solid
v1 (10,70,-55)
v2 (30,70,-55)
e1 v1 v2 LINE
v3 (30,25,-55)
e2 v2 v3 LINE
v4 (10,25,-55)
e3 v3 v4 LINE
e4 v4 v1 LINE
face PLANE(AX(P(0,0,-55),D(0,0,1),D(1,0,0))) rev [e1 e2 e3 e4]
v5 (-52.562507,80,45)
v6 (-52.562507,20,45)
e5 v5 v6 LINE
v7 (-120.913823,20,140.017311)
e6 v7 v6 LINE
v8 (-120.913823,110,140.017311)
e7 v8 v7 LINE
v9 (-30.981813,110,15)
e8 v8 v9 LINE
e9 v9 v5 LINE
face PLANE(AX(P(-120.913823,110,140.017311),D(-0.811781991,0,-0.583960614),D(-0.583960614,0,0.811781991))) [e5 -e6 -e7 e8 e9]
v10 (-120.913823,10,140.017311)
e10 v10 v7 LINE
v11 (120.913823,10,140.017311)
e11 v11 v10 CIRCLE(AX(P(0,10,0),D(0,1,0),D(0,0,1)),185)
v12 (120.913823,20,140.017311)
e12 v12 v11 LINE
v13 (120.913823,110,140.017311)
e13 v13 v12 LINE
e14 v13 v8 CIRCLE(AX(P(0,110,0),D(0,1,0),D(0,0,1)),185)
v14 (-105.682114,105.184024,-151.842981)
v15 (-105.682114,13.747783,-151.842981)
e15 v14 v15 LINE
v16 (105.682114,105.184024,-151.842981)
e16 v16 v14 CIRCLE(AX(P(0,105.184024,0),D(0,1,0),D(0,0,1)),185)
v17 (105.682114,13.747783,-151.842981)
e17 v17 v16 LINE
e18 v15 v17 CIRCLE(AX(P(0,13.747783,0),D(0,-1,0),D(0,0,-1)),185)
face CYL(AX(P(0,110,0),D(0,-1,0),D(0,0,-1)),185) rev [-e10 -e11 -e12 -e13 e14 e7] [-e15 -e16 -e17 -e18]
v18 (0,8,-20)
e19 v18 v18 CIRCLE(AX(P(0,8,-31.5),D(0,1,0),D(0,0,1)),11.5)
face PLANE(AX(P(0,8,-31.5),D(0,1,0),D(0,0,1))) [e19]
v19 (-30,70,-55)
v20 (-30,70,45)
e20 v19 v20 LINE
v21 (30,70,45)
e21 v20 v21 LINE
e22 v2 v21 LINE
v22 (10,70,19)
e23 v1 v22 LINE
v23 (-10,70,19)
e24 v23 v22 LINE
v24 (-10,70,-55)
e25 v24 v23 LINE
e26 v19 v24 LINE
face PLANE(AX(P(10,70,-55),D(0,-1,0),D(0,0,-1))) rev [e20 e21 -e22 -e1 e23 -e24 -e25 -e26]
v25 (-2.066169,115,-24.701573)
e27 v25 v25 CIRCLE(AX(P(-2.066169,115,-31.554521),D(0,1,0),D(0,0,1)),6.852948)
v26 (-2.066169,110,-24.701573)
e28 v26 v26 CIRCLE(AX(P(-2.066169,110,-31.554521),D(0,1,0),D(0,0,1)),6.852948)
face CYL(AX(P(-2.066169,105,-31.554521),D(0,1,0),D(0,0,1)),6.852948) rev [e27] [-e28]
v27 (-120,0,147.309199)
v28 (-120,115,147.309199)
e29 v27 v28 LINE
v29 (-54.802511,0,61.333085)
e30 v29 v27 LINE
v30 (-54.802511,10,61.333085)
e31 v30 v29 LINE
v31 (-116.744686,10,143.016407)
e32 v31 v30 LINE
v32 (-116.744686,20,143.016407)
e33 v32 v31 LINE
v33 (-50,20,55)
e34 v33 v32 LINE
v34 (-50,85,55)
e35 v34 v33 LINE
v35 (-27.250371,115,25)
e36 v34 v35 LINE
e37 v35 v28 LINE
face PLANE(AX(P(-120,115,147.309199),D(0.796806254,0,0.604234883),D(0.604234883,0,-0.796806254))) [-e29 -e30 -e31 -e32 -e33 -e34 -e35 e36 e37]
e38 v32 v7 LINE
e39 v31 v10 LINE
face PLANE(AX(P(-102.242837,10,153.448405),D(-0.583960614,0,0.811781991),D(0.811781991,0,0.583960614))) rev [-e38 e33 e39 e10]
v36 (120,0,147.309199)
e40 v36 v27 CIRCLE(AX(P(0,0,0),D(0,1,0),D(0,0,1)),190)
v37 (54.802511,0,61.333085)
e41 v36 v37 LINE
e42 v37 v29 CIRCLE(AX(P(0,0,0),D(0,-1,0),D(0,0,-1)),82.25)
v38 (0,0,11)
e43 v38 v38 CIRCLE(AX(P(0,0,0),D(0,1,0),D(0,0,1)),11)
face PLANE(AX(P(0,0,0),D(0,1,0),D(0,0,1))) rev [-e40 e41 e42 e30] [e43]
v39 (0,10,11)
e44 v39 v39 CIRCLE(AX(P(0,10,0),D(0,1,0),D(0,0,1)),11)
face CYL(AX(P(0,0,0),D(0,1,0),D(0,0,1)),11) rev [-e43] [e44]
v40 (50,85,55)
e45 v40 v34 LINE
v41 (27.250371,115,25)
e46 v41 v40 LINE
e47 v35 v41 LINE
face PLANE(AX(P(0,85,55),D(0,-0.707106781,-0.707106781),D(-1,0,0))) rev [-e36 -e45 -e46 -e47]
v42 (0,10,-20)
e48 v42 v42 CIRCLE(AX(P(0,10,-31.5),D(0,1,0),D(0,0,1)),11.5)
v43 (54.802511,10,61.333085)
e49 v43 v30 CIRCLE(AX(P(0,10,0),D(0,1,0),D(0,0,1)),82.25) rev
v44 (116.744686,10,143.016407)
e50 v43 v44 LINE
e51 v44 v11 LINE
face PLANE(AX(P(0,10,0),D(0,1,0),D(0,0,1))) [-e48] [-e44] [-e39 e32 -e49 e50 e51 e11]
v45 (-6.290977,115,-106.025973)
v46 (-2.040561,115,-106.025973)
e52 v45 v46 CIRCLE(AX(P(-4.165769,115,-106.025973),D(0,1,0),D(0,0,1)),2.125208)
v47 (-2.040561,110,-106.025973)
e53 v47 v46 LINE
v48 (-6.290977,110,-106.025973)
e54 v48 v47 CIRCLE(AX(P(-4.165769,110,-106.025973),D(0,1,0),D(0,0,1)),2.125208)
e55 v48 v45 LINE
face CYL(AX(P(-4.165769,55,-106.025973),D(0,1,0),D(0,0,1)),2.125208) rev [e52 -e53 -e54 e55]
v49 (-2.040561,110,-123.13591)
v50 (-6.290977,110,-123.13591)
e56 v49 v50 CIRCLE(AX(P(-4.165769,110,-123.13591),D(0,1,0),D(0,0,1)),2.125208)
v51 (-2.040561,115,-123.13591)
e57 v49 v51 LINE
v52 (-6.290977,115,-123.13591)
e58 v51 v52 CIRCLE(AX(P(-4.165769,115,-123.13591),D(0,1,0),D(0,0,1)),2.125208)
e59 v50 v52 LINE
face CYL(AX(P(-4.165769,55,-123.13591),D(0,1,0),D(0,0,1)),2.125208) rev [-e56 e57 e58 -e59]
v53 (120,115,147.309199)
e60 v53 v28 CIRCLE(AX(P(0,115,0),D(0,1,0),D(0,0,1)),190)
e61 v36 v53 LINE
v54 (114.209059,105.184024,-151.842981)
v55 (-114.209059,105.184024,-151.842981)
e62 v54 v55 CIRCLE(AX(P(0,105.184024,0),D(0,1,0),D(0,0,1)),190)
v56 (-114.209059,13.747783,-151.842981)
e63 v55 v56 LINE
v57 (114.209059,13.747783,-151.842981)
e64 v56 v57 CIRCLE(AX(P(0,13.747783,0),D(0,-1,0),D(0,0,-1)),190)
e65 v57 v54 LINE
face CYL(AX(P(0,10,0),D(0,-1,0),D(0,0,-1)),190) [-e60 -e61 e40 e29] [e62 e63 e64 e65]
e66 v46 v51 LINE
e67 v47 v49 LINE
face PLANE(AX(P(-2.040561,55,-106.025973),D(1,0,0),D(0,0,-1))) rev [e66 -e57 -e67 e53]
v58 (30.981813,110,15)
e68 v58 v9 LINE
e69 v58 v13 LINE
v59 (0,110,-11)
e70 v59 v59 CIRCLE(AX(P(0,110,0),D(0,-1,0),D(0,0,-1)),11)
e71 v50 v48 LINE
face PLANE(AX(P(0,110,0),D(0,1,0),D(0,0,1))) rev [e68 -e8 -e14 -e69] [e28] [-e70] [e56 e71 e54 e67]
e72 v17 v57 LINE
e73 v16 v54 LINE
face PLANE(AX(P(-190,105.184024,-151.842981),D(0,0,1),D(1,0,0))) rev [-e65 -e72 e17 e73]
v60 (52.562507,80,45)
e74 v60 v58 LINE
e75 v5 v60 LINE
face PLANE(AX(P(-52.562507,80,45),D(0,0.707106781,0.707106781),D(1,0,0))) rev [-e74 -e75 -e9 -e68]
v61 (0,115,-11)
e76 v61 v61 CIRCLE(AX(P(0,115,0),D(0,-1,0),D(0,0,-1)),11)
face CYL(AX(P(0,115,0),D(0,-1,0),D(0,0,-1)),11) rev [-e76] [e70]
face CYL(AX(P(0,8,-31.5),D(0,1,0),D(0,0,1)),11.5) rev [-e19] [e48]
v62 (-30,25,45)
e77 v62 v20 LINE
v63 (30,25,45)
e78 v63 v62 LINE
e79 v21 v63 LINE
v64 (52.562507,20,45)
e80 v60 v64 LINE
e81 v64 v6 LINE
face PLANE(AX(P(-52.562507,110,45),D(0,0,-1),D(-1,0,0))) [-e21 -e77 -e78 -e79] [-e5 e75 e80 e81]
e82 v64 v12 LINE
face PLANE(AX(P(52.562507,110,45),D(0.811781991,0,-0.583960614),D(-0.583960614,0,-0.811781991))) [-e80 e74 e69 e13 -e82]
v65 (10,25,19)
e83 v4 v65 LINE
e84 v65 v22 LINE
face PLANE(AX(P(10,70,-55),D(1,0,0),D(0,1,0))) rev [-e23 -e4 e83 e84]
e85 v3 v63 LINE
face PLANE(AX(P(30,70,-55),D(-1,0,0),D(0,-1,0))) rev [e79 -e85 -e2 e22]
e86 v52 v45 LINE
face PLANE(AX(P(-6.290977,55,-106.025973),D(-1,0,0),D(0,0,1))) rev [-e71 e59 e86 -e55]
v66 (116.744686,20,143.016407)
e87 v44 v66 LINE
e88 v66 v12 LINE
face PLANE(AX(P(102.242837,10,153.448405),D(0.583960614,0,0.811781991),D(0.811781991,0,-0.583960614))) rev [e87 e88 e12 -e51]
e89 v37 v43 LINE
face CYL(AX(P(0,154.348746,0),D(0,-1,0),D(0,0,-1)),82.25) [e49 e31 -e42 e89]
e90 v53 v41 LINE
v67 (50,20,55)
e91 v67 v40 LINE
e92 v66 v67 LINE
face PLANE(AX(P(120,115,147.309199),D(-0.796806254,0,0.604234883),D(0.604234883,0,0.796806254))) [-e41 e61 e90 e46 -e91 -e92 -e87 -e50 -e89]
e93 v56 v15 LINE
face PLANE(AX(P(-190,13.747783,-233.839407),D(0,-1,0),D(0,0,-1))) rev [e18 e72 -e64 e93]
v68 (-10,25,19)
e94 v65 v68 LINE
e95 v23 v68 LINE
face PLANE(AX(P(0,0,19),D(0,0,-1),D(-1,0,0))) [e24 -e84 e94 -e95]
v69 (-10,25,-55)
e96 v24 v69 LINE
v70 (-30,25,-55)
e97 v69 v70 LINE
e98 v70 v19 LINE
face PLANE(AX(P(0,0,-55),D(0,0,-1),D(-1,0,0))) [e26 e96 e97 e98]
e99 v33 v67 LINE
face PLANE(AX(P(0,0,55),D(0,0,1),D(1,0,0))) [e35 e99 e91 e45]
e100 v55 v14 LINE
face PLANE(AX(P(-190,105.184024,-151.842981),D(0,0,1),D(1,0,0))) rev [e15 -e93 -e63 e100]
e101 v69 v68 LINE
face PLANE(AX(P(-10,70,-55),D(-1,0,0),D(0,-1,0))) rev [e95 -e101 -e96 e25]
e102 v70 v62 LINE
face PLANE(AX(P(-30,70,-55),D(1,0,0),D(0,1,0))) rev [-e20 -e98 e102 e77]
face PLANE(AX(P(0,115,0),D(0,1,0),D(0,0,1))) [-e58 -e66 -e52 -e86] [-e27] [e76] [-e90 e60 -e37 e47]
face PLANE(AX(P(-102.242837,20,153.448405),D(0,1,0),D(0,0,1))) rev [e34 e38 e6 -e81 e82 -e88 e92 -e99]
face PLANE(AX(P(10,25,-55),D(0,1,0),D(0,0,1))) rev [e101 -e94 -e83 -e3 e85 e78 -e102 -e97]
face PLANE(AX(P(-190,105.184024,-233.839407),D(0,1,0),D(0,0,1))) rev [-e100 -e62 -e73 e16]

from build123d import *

# Parameters (mm, degrees)
SKETCH_1_R                = 190
EXTRUDE_1_DEPTH           = 10
SKETCH_2_R                = 11
CUT_EXTRUDE_1_DEPTH       = 10
CUT_EXTRUDE_2_DEPTH       = 10
CUT_EXTRUDE_3_DEPTH       = 10
SKETCH_5_R                = 11.5
CUT_EXTRUDE_4_DEPTH       = 2
EXTRUDE_2_DEPTH           = 100
EXTRUDE_3_DEPTH           = 5
CUT_EXTRUDE_START         = -5
SKETCH_11_R               = 11
CUT_EXTRUDE_7_DEPTH       = 5
SKETCH_12_W               = 100
SKETCH_12_H               = 115
EXTRUDE_4_DEPTH           = 5
EXTRUDE_5_DEPTH           = 115
CUT_EXTRUDE_8_DEPTH       = 289.487434735
SKETCH_15_W               = 110
SKETCH_15_H               = 10
CUT_EXTRUDE_9_DEPTH       = 23
SKETCH_16_W               = 110
SKETCH_16_H               = 10
CUT_EXTRUDE_10_DEPTH      = 23
EXTRUDE_6_DEPTH           = 10
SKETCH_18_R               = 10
EXTRUDE_7_DEPTH           = 100
SKETCH_20_W               = 40.15762627
SKETCH_20_H               = 37.957208392
EXTRUDE_8_DEPTH           = 20
CUT_EXTRUDE_11_DEPTH      = 70
SKETCH_22_W               = 6
SKETCH_22_H               = 39.800206828
SKETCH_24_R               = 10.715541735
EXTRUDE_9_DEPTH           = 50
SKETCH_25_R               = 8.111462828
CUT_EXTRUDE_13_DEPTH      = 1
FILLET_2_R                = 3
SKETCH_26_W               = 20.914862296
SKETCH_26_H               = 66.390296829
CUT_EXTRUDE_14_DEPTH      = 41
EXTRUDE_START             = -5
EXTRUDE_10_DEPTH          = 5
CUT_EXTRUDE_15_DEPTH      = 369.496652909
CUT_EXTRUDE_15_DEPTH_BACK = 369.496652909
SKETCH_28_W               = 81.996426071
SKETCH_28_H               = 91.436240801
EXTRUDE_11_DEPTH          = 142
SKETCH_30_W               = 61.807944975
SKETCH_30_H               = 65.134221846
EXTRUDE_12_DEPTH          = 5
FILLET_4_R                = 13
SKETCH_31_W               = 61.807944975
SKETCH_31_H               = 147
EXTRUDE_13_DEPTH          = 70
SKETCH_32_W               = 51.807944975
SKETCH_32_H               = 142
CUT_EXTRUDE_16_DEPTH      = 60
FILLET_5_R                = 13
FILLET_6_R                = 13
CUT_EXTRUDE_17_DEPTH      = 60
CUT_EXTRUDE_18_DEPTH      = 60
EXTRUDE_START_2           = -75
SKETCH_35_W               = 61.807944975
SKETCH_35_H               = 6.562212177
EXTRUDE_14_DEPTH          = 75
CUT_EXTRUDE_19_DEPTH      = 60
CUT_EXTRUDE_START_2       = 70
CUT_EXTRUDE_20_DEPTH      = 70
SKETCH_40_R               = 6.852948308
CUT_EXTRUDE_24_DEPTH      = 10
CHAMFER_1_SIZE            = 30
CHAMFER_2_SIZE            = 30
CUT_EXTRUDE_25_DEPTH      = 216
CUT_EXTRUDE_26_DEPTH      = 10
CUT_EXTRUDE_26_DEPTH_BACK = 20
SKETCH_42_W               = 161.925382199
SKETCH_42_H               = 10
SKETCH_43_W               = 20
SKETCH_43_H               = 45
EXTRUDE_15_DEPTH          = 100
SKETCH_44_W               = 60
SKETCH_44_H               = 45
EXTRUDE_16_DEPTH          = 26


# Read off the part's stored shape, not the designer's step: 圆顶1
with BuildPart() as part:
    # 草图1 → 凸台-拉伸1 (new body)
    with BuildSketch(Plane(origin=(0, 0, 0), x_dir=(1, 0, 0), z_dir=(0, 1, 0))):
        with Locations(Location((0, 0, 0), (0, 0, 270))):
            Circle(SKETCH_1_R)
    extrude(amount=EXTRUDE_1_DEPTH)

    # 草图2 → 切除-拉伸1 (cut)
    with BuildSketch(Plane(origin=(0, 10, 0), x_dir=(1, 0, 0), z_dir=(0, 1, 0))):
        with Locations(Location((0, 0, 0), (0, 0, 270))):
            Circle(SKETCH_2_R)
    extrude(amount=-CUT_EXTRUDE_1_DEPTH, mode=Mode.SUBTRACT)

    # 草图3 → 切除-拉伸2 (cut)
    with BuildSketch(Plane(origin=(0, 10, 0), x_dir=(1, 0, 0), z_dir=(0, 1, 0))):
        Polygon((-50, -50), (-120, -147.309198627), (120, -147.309198627), (50, -50), align=None)
    extrude(amount=-CUT_EXTRUDE_2_DEPTH, mode=Mode.SUBTRACT)

    # 草图4 → 切除-拉伸3 (cut)
    with BuildSketch(Plane(origin=(0, 10, 0), x_dir=(1, 0, 0), z_dir=(0, 1, 0))):
        Polygon((50, -50), (136.06201209, -169.637506124), (-54.476164161, -215.928987862), (-150.534220248, -169.637506124), (-120, -147.309198627), (-80.889727825, -92.940780863), align=None)
    extrude(amount=-CUT_EXTRUDE_3_DEPTH, mode=Mode.SUBTRACT)

    # 草图5 → 切除-拉伸4 (cut)
    with BuildSketch(Plane(origin=(0, 10, 0), x_dir=(1, 0, 0), z_dir=(0, 1, 0))):
        with Locations(Location((0, 31.5, 0), (0, 0, 270))):
            Circle(SKETCH_5_R)
    extrude(amount=-CUT_EXTRUDE_4_DEPTH, mode=Mode.SUBTRACT)

    # 草图9 → 凸台-拉伸2 (add)
    with BuildSketch(Plane(origin=(0, 10, 0), x_dir=(1, 0, 0), z_dir=(0, 1, 0))):
        with BuildLine():
            Line((50, -50), (120, -147.309198627))
            ThreePointArc((120, -147.309198627), (0, 190), (-120, -147.309198627))
            Line((-120, -147.309198627), (-50, -50))
            Line((-50, -50), (50, -50))
        make_face()
        with BuildLine():
            Line((52.56250687, -45), (120.913822869, -140.017311213))
            ThreePointArc((120.913822869, -140.017311213), (0, 185), (-120.913822869, -140.017311213))
            Line((-120.913822869, -140.017311213), (-52.56250687, -45))
            Line((-52.56250687, -45), (52.56250687, -45))
        make_face(mode=Mode.SUBTRACT)
    extrude(amount=EXTRUDE_2_DEPTH)

    # 草图10 → 凸台-拉伸3 (add)
    with BuildSketch(Plane(origin=(0, 110, 0), x_dir=(1, 0, 0), z_dir=(0, 1, 0))):
        with BuildLine():
            Line((-50, -50), (50, -50))
            Line((50, -50), (120, -147.309198627))
            ThreePointArc((120, -147.309198627), (0, 190), (-120, -147.309198627))
            Line((-120, -147.309198627), (-50, -50))
        make_face()
    extrude(amount=EXTRUDE_3_DEPTH)

    # 草图11 → 切除-拉伸7 (cut)
    with BuildSketch(Plane.XZ.offset(-110).offset(CUT_EXTRUDE_START)):
        with Locations(Location((0, 0, 0), (0, 0, 90))):
            Circle(SKETCH_11_R)
    extrude(amount=CUT_EXTRUDE_7_DEPTH, mode=Mode.SUBTRACT)

    # 草图12 → 凸台-拉伸4 (add)
    with BuildSketch(Plane.XY.offset(50)):
        with Locations((0, 57.5)):
            Rectangle(SKETCH_12_W, SKETCH_12_H)
    extrude(amount=EXTRUDE_4_DEPTH)

    # 草图13 → 凸台-拉伸5 (add)
    with BuildSketch(Plane.XZ):
        Polygon((-120, 147.309198627), (-50, 55), (-50, 50), align=None)
        Polygon((50, 50), (120, 147.309198627), (50, 55), align=None)
    extrude(amount=-EXTRUDE_5_DEPTH)

    # 草图14 → 切除-拉伸8 (cut, through all)
    with BuildSketch(Plane(origin=(0, 10, 0), x_dir=(1, 0, 0), z_dir=(0, 1, 0))):
        with BuildLine():
            Line((-175, 60), (175, 60))
            ThreePointArc((175, 60), (0, 185), (-175, 60))
        make_face()
    extrude(amount=CUT_EXTRUDE_8_DEPTH, mode=Mode.SUBTRACT)

    # 草图15 → 切除-拉伸9 (cut)
    with BuildSketch(Plane(origin=(-13.305974514, 0, -9.571738635), x_dir=(-0.5839606140594331, 0, 0.8117819911942675), z_dir=(-0.8117819911942675, 0, -0.5839606140594331))):
        with Locations((129.272441949, 15)):
            Rectangle(SKETCH_15_W, SKETCH_15_H)
    extrude(amount=-CUT_EXTRUDE_9_DEPTH, mode=Mode.SUBTRACT)

    # 草图16 → 切除-拉伸10 (cut)
    with BuildSketch(Plane(origin=(13.305974514, 0, -9.571738635), x_dir=(-0.5839606140594333, 0, -0.8117819911942674), z_dir=(0.8117819911942673, 0, -0.5839606140594332))):
        with Locations((-129.272441949, 15)):
            Rectangle(SKETCH_16_W, SKETCH_16_H)
    extrude(amount=-CUT_EXTRUDE_10_DEPTH, mode=Mode.SUBTRACT)

    # 草图17 → 凸台-拉伸6 (add)
    with BuildSketch(Plane.XZ):
        with BuildLine():
            Line((-68.721971502, 45.192401274), (70.16486598, 42.91799252))
            ThreePointArc((70.16486598, 42.91799252), (1.34674419, 82.238973608), (-68.721971502, 45.192401274))
        make_face()
    extrude(amount=-EXTRUDE_6_DEPTH)

    # 草图18 → 凸台-拉伸7 (add)
    with BuildSketch(Plane(origin=(0, 115, 0), x_dir=(1, 0, 0), z_dir=(0, 1, 0))):
        with Locations(Location((0, 46.854928923, 0), (0, 0, 90))):
            Circle(SKETCH_18_R)
    extrude(amount=EXTRUDE_7_DEPTH)

    # 草图20 → 凸台-拉伸8 (add)
    with BuildSketch(Plane(origin=(0, 215, 0), x_dir=(1, 0, 0), z_dir=(0, 1, 0))):
        with Locations((-0.847426087, 46.622471939)):
            Rectangle(SKETCH_20_W, SKETCH_20_H)
    extrude(amount=EXTRUDE_8_DEPTH)

    # 草图21 → 切除-拉伸11 (cut)
    with BuildSketch(Plane.ZY.offset(20.926239222)):
        Polygon((-54.791741718, 236.72389037), (-19.944006341, 217.982251176), (-19.065492004, 240.530785832), align=None)
    extrude(amount=-CUT_EXTRUDE_11_DEPTH, mode=Mode.SUBTRACT)

    # 草图22 → 旋转1 (revolve)
    with BuildSketch(Plane(origin=(0, 160.757687824, 86.457916141), x_dir=(1, 0, 0), z_dir=(0, 0.8807086333026608, 0.4736584246333635)), mode=Mode.PRIVATE) as revolve_1_sk:
        with Locations((1.240539722, 142.968257651)):
            Rectangle(SKETCH_22_W, SKETCH_22_H)
    revolve(revolve_1_sk.sketch.rotate(Axis((-1.759460278, 237.901659149, -56.981655541), (0, -0.47365842463336366, 0.8807086333026606)), 90), axis=Axis((-1.759460278, 237.901659149, -56.981655541), (0, -0.47365842463336366, 0.8807086333026606)))

    # 草图24 → 凸台-拉伸9 (add)
    with BuildSketch(Plane(origin=(0, 58.292268059, -108.387185922), x_dir=(1, 0, 0), z_dir=(0, -0.4736584246333635, 0.8807086333026606))):
        with Locations(Location((-1.759460278, 182.532203893, 0), (0, 0, 270))):
            Circle(SKETCH_24_R)
    extrude(amount=-EXTRUDE_9_DEPTH)

    # 草图25 → 切除-拉伸13 (cut)
    with BuildSketch(Plane(origin=(0, 58.292268059, -108.387185922), x_dir=(1, 0, 0), z_dir=(0, -0.4736584246333635, 0.8807086333026606))):
        with Locations(Location((-1.759460278, 182.532203893, 0), (0, 0, 270))):
            Circle(SKETCH_25_R)
    extrude(amount=-CUT_EXTRUDE_13_DEPTH, mode=Mode.SUBTRACT)

    # 圆角2
    fillet_2_edges = [part.edges().sort_by_distance(p)[0] for p in [
        (0, 115, -36.854928923),
    ]]
    fillet(fillet_2_edges, radius=FILLET_2_R)

    # 草图26 → 切除-拉伸14 (cut)
    with BuildSketch(Plane(origin=(0, 160.757687824, 86.457916141), x_dir=(1, 0, 0), z_dir=(0, 0.8807086333026608, 0.4736584246333635))):
        with Locations((27.855490238, 146.001600843)):
            Rectangle(SKETCH_26_W, SKETCH_26_H)
    extrude(amount=-CUT_EXTRUDE_14_DEPTH, mode=Mode.SUBTRACT)

    # 草图27 → 凸台-拉伸10 (add)
    with BuildSketch(Plane(origin=(0, 115, 0), x_dir=(1, 0, 0), z_dir=(0, 1, 0)).offset(EXTRUDE_START)):
        with BuildLine():
            Line((-175, 60), (175, 60))
            ThreePointArc((175, 60), (0, 185), (-175, 60))
        make_face()
    extrude(amount=EXTRUDE_10_DEPTH)

    # 草图28 → 切除-拉伸15 (cut, two sides: drawn at the far end of the back side and taken through both)
    with BuildSketch(Plane(origin=(0, 0, 0), x_dir=(0, 0, -1), z_dir=(1, 0, 0)).offset(-CUT_EXTRUDE_15_DEPTH_BACK)):
        with Locations((192.841193776, 59.465903433)):
            Rectangle(SKETCH_28_W, SKETCH_28_H)
    extrude(amount=CUT_EXTRUDE_15_DEPTH + CUT_EXTRUDE_15_DEPTH_BACK, mode=Mode.SUBTRACT)

    # 草图29 → 凸台-拉伸11 (add)
    with BuildSketch(Plane(origin=(0, 115, 0), x_dir=(1, 0, 0), z_dir=(0, 1, 0))):
        Polygon((-32.985541705, 83.704196909), (-32.985541705, 18.569975063), (-27.985541705, 18.569975063), (-27.985541705, 78.704196909), (23.82240327, 78.704196909), (23.82240327, 18.569975063), (28.82240327, 18.569975063), (28.82240327, 83.704196909), align=None)
    extrude(amount=EXTRUDE_11_DEPTH)

    # 草图30 → 凸台-拉伸12 (add)
    with BuildSketch(Plane(origin=(0, 257, 0), x_dir=(1, 0, 0), z_dir=(0, 1, 0))):
        with Locations((-2.081569218, 51.137085986)):
            Rectangle(SKETCH_30_W, SKETCH_30_H)
    extrude(amount=EXTRUDE_12_DEPTH)

    # 圆角4
    fillet_4_edges = [part.edges().sort_by_distance(p)[0] for p in [
        (-27.985541705, 257, -48.637085986),
        (23.82240327, 257, -48.637085986),
    ]]
    fillet(fillet_4_edges, radius=FILLET_4_R)

    # 草图31 → 凸台-拉伸13 (add)
    with BuildSketch(Plane(origin=(0, 0, -83.704196909), x_dir=(-1, 0, 0), z_dir=(0, 0, -1))):
        with Locations((2.081569218, 188.5)):
            Rectangle(SKETCH_31_W, SKETCH_31_H)
    extrude(amount=EXTRUDE_13_DEPTH)

    # 草图32 → 切除-拉伸16 (cut)
    with BuildSketch(Plane(origin=(0, 0, -153.704196909), x_dir=(-1, 0, 0), z_dir=(0, 0, -1))):
        with Locations((2.081569218, 186)):
            Rectangle(SKETCH_32_W, SKETCH_32_H)
    extrude(amount=-CUT_EXTRUDE_16_DEPTH, mode=Mode.SUBTRACT)

    # 圆角5
    fillet_5_edges = [part.edges().sort_by_distance(p)[0] for p in [
        (-32.985541705, 262, -86.137085986),
        (28.82240327, 262, -86.137085986),
    ]]
    fillet(fillet_5_edges, radius=FILLET_5_R)

    # 圆角6
    fillet_6_edges = [part.edges().sort_by_distance(p)[0] for p in [
        (23.82240327, 257, -123.704196909),
        (-27.985541705, 257, -123.704196909),
    ]]
    fillet(fillet_6_edges, radius=FILLET_6_R)

    # 草图33 → 切除-拉伸17 (cut)
    with BuildSketch(Plane.XY.offset(-78.704196909)):
        with BuildLine():
            Line((13.892318938, 199.249147057), (13.892318938, 143.139086494))
            ThreePointArc((13.892318938, 143.139086494), (0, 129.246767556), (-13.892318938, 143.139086494))
            Line((-13.892318938, 143.139086494), (-13.892318938, 199.249147057))
            ThreePointArc((-13.892318938, 199.249147057), (0, 213.141465996), (13.892318938, 199.249147057))
        make_face()
    extrude(amount=-CUT_EXTRUDE_17_DEPTH, mode=Mode.SUBTRACT)

    # 草图34 → 切除-拉伸18 (cut)
    with BuildSketch(Plane(origin=(0, 115, 0), x_dir=(1, 0, 0), z_dir=(0, 1, 0))):
        with BuildLine():
            Line((-6.290976551, 106.02597296), (-6.290976551, 123.135910488))
            ThreePointArc((-6.290976551, 123.135910488), (-4.165768662, 125.261118376), (-2.040560774, 123.135910488))
            Line((-2.040560774, 123.135910488), (-2.040560774, 106.02597296))
            ThreePointArc((-2.040560774, 106.02597296), (-4.165768662, 103.900765071), (-6.290976551, 106.02597296))
        make_face()
    extrude(amount=-CUT_EXTRUDE_18_DEPTH, mode=Mode.SUBTRACT)

    # 草图35 → 凸台-拉伸14 (add)
    with BuildSketch(Plane(origin=(0, 0, -153.704196909), x_dir=(-1, 0, 0), z_dir=(0, 0, -1)).offset(EXTRUDE_START_2)):
        with Locations((2.081569218, 185.281106088)):
            Rectangle(SKETCH_35_W, SKETCH_35_H)
    extrude(amount=EXTRUDE_14_DEPTH)

    # 草图36 → 切除-拉伸19 (cut)
    with BuildSketch(Plane(origin=(0, 188.562212177, 0), x_dir=(1, 0, 0), z_dir=(0, 1, 0))):
        with BuildLine():
            Line((-6.290976551, 123.135910488), (-6.290976551, 106.02597296))
            ThreePointArc((-6.290976551, 106.02597296), (-4.165768662, 103.900765071), (-2.040560774, 106.02597296))
            Line((-2.040560774, 106.02597296), (-2.040560774, 123.135910488))
            ThreePointArc((-2.040560774, 123.135910488), (-4.165768662, 125.261118376), (-6.290976551, 123.135910488))
        make_face()
    extrude(amount=-CUT_EXTRUDE_19_DEPTH, mode=Mode.SUBTRACT)

    # 圆顶1 outline → 圆顶1 (revolve)
    with BuildSketch(Plane(origin=(-1.759460278, 160.757687824, 86.457916141), x_dir=(1, 0, 0), z_dir=(0, 0.880708633302661, 0.473658424633363))):
        with BuildLine():
            Line((0, 124.068154246), (0, 119.068154237))
            ThreePointArc((0, 119.068154237), (4.764342278, 120.41858011), (8.111462832, 124.068154246))
            Line((8.111462832, 124.068154246), (0, 124.068154246))
        make_face()
    revolve(axis=Axis((-1.759460278, 160.757687824, 86.457916141), (0, 0.473658424633363, -0.880708633302661)))

    # 草图37 → 切除-拉伸20 (cut)
    with BuildSketch(Plane.XY.offset(-78.704196909).offset(CUT_EXTRUDE_START_2)):
        with BuildLine():
            Line((-27.985541705, 115), (23.82240327, 115))
            Line((23.82240327, 115), (23.82240327, 244))
            ThreePointArc((23.82240327, 244), (20.014791425, 253.192388155), (10.82240327, 257))
            Line((10.82240327, 257), (-14.985541705, 257))
            ThreePointArc((-14.985541705, 257), (-24.177929861, 253.192388155), (-27.985541705, 244))
            Line((-27.985541705, 244), (-27.985541705, 115))
        make_face()
    extrude(amount=-CUT_EXTRUDE_20_DEPTH, mode=Mode.SUBTRACT)

    # 草图40 → 切除-拉伸24 (cut)
    with BuildSketch(Plane(origin=(0, 115, 0), x_dir=(1, 0, 0), z_dir=(0, 1, 0))):
        with Locations(Location((-2.06616942, 31.55452141, 0), (0, 0, 270))):
            Circle(SKETCH_40_R)
    extrude(amount=-CUT_EXTRUDE_24_DEPTH, mode=Mode.SUBTRACT)

    # 倒角1
    chamfer_1_edges = [part.edges().sort_by_distance(p)[0] for p in [
        (0, 115, 55),
    ]]
    chamfer(chamfer_1_edges, length=CHAMFER_1_SIZE)

    # 倒角2
    chamfer_2_edges = [part.edges().sort_by_distance(p)[0] for p in [
        (0, 110, 45),
    ]]
    chamfer(chamfer_2_edges, length=CHAMFER_2_SIZE)

    # 草图41 → 切除-拉伸25 (cut)
    with BuildSketch(Plane(origin=(0, 115, 0), x_dir=(1, 0, 0), z_dir=(0, 1, 0))):
        with BuildLine():
            Line((-120, -147.309198627), (-27.250371239, -25))
            Line((-27.250371239, -25), (27.250371239, -25))
            Line((27.250371239, -25), (120, -147.309198627))
            ThreePointArc((120, -147.309198627), (0, 190), (-120, -147.309198627))
        make_face()
    extrude(amount=CUT_EXTRUDE_25_DEPTH, mode=Mode.SUBTRACT)

    # 草图42 → 切除-拉伸26 (cut, two sides: drawn at the far end of the back side and taken through both)
    with BuildSketch(Plane.XY.offset(55).offset(-CUT_EXTRUDE_26_DEPTH_BACK)):
        with Locations((4.31271157, 15)):
            Rectangle(SKETCH_42_W, SKETCH_42_H)
    extrude(amount=CUT_EXTRUDE_26_DEPTH + CUT_EXTRUDE_26_DEPTH_BACK, mode=Mode.SUBTRACT)

    # 草图43 → 凸台-拉伸15 (add)
    with BuildSketch(Plane(origin=(0, 0, 45), x_dir=(-1, 0, 0), z_dir=(0, 0, -1))):
        with Locations((-20, 47.5)):
            Rectangle(SKETCH_43_W, SKETCH_43_H)
        with Locations((20, 47.5)):
            Rectangle(SKETCH_43_W, SKETCH_43_H)
    extrude(amount=EXTRUDE_15_DEPTH)

    # 草图44 → 凸台-拉伸16 (add)
    with BuildSketch(Plane(origin=(0, 0, 45), x_dir=(-1, 0, 0), z_dir=(0, 0, -1))):
        with Locations((0, 47.5)):
            Rectangle(SKETCH_44_W, SKETCH_44_H)
    extrude(amount=EXTRUDE_16_DEPTH)


solid = part.part
